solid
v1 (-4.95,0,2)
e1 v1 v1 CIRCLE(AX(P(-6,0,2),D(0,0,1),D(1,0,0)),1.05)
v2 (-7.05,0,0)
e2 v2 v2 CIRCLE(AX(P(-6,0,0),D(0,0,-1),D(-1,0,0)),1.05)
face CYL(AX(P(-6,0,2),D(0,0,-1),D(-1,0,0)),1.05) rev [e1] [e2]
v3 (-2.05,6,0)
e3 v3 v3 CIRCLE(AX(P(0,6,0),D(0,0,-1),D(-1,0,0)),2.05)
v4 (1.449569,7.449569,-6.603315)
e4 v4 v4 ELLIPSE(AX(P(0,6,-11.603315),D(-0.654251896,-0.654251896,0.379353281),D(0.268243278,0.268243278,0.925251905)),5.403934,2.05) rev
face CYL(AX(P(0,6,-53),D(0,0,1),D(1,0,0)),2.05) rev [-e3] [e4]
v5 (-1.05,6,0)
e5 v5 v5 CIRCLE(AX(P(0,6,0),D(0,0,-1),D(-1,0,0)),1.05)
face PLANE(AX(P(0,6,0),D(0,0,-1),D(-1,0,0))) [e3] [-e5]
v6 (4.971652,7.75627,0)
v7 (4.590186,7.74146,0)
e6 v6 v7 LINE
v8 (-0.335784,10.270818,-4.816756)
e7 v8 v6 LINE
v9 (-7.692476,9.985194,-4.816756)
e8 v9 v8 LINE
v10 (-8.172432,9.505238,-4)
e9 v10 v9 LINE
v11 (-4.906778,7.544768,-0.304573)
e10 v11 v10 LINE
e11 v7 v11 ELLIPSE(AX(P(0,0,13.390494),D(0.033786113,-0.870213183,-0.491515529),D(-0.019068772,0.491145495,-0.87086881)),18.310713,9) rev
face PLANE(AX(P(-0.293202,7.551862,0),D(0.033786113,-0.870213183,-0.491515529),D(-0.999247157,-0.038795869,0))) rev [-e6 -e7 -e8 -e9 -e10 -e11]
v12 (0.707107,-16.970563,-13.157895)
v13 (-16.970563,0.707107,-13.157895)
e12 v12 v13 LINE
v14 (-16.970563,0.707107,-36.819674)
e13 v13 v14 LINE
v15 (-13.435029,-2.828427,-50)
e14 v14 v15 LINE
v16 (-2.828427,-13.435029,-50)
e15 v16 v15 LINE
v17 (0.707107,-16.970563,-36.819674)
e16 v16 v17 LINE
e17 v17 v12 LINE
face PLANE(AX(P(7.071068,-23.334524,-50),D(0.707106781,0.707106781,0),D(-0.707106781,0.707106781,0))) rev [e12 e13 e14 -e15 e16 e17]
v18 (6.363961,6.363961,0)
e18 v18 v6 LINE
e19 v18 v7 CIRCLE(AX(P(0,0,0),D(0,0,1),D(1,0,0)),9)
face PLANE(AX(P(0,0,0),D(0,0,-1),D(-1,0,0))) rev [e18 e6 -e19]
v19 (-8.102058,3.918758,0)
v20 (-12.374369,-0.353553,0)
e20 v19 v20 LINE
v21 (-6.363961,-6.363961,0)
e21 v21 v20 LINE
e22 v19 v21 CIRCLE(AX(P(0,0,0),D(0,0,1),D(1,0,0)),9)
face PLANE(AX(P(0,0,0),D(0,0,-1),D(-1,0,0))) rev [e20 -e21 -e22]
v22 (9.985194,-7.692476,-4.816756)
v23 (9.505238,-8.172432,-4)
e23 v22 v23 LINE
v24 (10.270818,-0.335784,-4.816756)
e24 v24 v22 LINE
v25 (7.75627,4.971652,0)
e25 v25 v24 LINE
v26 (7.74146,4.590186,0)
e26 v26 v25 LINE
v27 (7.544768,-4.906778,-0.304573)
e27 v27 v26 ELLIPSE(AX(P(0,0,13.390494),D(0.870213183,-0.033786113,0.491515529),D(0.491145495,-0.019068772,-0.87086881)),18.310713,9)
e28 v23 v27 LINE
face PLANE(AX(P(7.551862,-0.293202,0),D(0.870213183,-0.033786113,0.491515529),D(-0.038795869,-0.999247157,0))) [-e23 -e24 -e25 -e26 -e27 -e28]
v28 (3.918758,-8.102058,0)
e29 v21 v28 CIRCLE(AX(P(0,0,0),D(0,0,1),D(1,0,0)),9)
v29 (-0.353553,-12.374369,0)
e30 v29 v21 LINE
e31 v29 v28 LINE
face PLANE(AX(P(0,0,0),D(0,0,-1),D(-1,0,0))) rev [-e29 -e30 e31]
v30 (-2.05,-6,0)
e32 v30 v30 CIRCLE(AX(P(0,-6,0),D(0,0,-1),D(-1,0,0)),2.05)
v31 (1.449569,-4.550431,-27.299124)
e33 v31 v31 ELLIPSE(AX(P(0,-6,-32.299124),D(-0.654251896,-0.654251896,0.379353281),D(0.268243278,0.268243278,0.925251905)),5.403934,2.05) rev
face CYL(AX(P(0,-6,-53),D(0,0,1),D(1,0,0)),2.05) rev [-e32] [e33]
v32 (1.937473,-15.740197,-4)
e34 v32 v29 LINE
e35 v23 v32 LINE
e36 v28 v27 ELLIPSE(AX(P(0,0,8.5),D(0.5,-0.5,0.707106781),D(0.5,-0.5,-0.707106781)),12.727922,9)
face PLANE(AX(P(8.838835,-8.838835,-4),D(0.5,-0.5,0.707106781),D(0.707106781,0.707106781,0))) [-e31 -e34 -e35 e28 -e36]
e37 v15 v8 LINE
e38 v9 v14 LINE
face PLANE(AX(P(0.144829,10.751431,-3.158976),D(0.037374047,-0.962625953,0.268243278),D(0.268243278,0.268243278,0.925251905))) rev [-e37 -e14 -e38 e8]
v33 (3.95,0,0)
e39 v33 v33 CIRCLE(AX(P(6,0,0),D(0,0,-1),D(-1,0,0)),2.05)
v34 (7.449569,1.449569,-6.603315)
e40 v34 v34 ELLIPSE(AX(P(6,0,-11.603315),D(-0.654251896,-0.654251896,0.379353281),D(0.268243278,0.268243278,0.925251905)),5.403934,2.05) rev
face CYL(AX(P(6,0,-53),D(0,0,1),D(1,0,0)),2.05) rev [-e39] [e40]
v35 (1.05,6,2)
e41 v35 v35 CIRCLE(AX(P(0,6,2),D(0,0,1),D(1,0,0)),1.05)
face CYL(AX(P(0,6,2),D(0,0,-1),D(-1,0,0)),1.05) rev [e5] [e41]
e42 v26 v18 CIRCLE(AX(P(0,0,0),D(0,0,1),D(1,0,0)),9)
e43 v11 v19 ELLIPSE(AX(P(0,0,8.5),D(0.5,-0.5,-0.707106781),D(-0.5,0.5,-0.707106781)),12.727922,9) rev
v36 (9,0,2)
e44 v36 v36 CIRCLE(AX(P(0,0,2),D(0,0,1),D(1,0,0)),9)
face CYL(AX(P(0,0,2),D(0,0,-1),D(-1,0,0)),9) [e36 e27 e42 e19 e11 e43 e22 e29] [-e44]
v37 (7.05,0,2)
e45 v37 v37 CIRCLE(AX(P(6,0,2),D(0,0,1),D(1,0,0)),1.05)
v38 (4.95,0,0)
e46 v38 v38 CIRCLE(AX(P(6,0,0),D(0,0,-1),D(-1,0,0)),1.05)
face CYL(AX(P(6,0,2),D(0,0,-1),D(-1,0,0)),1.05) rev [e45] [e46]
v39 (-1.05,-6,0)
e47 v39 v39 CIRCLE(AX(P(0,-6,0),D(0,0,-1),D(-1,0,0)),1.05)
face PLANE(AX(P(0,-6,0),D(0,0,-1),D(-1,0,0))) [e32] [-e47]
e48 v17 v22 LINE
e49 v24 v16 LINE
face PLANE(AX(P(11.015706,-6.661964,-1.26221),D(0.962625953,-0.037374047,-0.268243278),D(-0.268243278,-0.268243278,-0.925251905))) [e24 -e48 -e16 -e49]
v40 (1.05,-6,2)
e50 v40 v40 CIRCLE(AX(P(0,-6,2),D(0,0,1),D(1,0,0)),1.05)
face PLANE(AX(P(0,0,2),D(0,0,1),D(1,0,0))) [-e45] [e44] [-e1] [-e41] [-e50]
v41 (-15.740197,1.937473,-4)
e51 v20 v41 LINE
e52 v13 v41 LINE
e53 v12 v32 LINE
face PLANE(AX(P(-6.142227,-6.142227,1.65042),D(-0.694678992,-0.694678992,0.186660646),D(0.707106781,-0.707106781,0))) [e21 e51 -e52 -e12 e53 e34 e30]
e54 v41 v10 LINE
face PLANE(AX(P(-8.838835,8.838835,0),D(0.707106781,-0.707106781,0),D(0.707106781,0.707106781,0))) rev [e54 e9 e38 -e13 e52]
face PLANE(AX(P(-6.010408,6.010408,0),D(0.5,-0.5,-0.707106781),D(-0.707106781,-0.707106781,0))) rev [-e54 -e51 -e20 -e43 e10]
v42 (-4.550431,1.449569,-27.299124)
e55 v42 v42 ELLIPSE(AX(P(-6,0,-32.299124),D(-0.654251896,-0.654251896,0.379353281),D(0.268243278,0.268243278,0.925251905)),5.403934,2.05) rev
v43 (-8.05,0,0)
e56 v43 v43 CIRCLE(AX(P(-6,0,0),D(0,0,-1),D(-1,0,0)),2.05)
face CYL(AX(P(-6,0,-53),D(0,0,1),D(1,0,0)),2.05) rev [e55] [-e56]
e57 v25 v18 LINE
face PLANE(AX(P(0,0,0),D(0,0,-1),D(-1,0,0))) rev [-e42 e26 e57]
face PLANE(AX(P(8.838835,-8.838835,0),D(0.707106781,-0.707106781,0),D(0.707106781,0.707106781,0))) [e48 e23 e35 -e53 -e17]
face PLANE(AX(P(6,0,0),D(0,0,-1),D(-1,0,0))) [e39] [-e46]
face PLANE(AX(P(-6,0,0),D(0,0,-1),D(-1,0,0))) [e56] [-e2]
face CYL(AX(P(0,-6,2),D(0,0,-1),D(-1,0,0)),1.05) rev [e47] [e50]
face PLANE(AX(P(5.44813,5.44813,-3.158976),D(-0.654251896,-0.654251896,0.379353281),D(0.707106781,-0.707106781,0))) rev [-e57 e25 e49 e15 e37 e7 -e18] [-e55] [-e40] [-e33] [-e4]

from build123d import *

# Parameters (mm, degrees)
SKETCH1_R           = 9
SKETCH1_R_2         = 1.05
BOSS_EXTRUDE1_DEPTH = 2
CHAMFER1_SIZE       = 4
CUT_EXTRUDE3_START  = -53
SKETCH6_R           = 1.05
CUT_EXTRUDE3_DEPTH  = 53
CUT_EXTRUDE4_START  = -2
SKETCH5_R           = 2.05
CUT_EXTRUDE4_DEPTH  = 53
CHAMFER2_SIZE       = 5
CHAMFER3_SIZE       = 5
CHAMFER3_SIZE_2     = 4.05977785
SKETCH8_W           = 40.645388092
SKETCH8_H           = 21.779978949
CUT_EXTRUDE5_DEPTH  = 34


with BuildPart() as part:
    # Sketch1 → Boss-Extrude1 (new body)
    with BuildSketch(Plane.XY):
        Circle(SKETCH1_R)
        with Locations((0, 6)):
            Circle(SKETCH1_R_2, mode=Mode.SUBTRACT)
        with Locations((-6, 0)):
            Circle(SKETCH1_R_2, mode=Mode.SUBTRACT)
        with Locations((0, -6)):
            Circle(SKETCH1_R_2, mode=Mode.SUBTRACT)
        with Locations((6, 0)):
            Circle(SKETCH1_R_2, mode=Mode.SUBTRACT)
    extrude(amount=BOSS_EXTRUDE1_DEPTH)

    # Sketch3 → Loft1 section 0
    with BuildSketch(Plane(origin=(0, 0, -50), x_dir=(-1, 0, 0), z_dir=(0, 0, -1))):
        with BuildLine():
            Line((-0.707106781, -16.970562748), (16.970562748, 0.707106781))
            Line((16.970562748, 0.707106781), (21.920310217, -4.242640687))
            Line((21.920310217, -4.242640687), (4.242640687, -21.920310217))
            Line((4.242640687, -21.920310217), (-0.707106781, -16.970562748))
        make_face()
    # Sketch2 → Loft1 section 1
    with BuildSketch(Plane(origin=(0, 0, 0), x_dir=(-1, 0, 0), z_dir=(0, 0, -1))):
        with BuildLine():
            Line((-15.202795796, -2.474873734), (2.474873734, 15.202795796))
            Line((2.474873734, 15.202795796), (15.202795796, 2.474873734))
            Line((15.202795796, 2.474873734), (-2.474873734, -15.202795796))
            Line((-2.474873734, -15.202795796), (-15.202795796, -2.474873734))
        make_face()
    loft()

    # Chamfer1
    # the kernel refuses this chamfer: 4 mm, written as the material it takes off along each edge
    with BuildSketch(Plane(origin=(-4.798944185, -22.476613715, 0), x_dir=(-0.7068394360706721, 0.7068394360706747, 0.027495876610586344), z_dir=(0.7071067811865488, 0.7071067811865462, 0))) as chamfer1_piece_1_section:
        Polygon((CHAMFER1_SIZE * 0.999621916911, -CHAMFER1_SIZE * 0.0274958766106), (-CHAMFER1_SIZE * 0.0274958766106, -CHAMFER1_SIZE * 0.999621916911), (0, 0), align=None)
    chamfer1_piece_1 = extrude(amount=38.573463904, mode=Mode.PRIVATE)
    chamfer1_piece_1 = chamfer1_piece_1 - Plane(origin=(0, 0, -1.322334287), x_dir=(1, 0, 0), z_dir=(0, 0, -1)) * Cylinder(9, 94, mode=Mode.PRIVATE)
    add(chamfer1_piece_1, mode=Mode.SUBTRACT)
    with BuildSketch(Plane(origin=(4.798944185, 22.476613715, 0), x_dir=(0.7068394360706721, -0.7068394360706749, 0.027495876610586396), z_dir=(-0.7071067811865489, -0.7071067811865461, 0))) as chamfer1_piece_2_section:
        Polygon((CHAMFER1_SIZE * 0.999621916911, -CHAMFER1_SIZE * 0.0274958766106), (-CHAMFER1_SIZE * 0.0274958766106, -CHAMFER1_SIZE * 0.999621916911), (0, 0), align=None)
    chamfer1_piece_2 = extrude(amount=38.573463904, mode=Mode.PRIVATE)
    chamfer1_piece_2 = chamfer1_piece_2 - Plane(origin=(0, 0, -1.322334287), x_dir=(1, 0, 0), z_dir=(0, 0, -1)) * Cylinder(9, 94, mode=Mode.PRIVATE)
    add(chamfer1_piece_2, mode=Mode.SUBTRACT)

    # Sketch6 → Cut-Extrude3 (cut)
    with BuildSketch(Plane.XY.offset(2).offset(CUT_EXTRUDE3_START)):
        with Locations(Location((0, -6, 0), (0, 0, 45))):
            Circle(SKETCH6_R)
        with Locations(Location((6, 0, 0), (0, 0, 45))):
            Circle(SKETCH6_R)
        with Locations(Location((0, 6, 0), (0, 0, 45))):
            Circle(SKETCH6_R)
        with Locations(Location((-6, 0, 0), (0, 0, 45))):
            Circle(SKETCH6_R)
    extrude(amount=CUT_EXTRUDE3_DEPTH, mode=Mode.SUBTRACT)

    # Sketch5 → Cut-Extrude4 (cut)
    with BuildSketch(Plane.XY.offset(2).offset(CUT_EXTRUDE4_START)):
        with Locations(Location((-6, 0, 0), (0, 0, 45))):
            Circle(SKETCH5_R)
        with Locations(Location((0, -6, 0), (0, 0, 45))):
            Circle(SKETCH5_R)
        with Locations(Location((0, 6, 0), (0, 0, 45))):
            Circle(SKETCH5_R)
        with Locations(Location((6, 0, 0), (0, 0, 45))):
            Circle(SKETCH5_R)
    extrude(amount=-CUT_EXTRUDE4_DEPTH, mode=Mode.SUBTRACT)

    # Chamfer2
    chamfer2_edges = [part.edges().sort_by_distance(p)[0] for p in [
        (-10.302545802, 7.375123728, -27),
        (7.375123728, -10.302545802, -27),
    ]]
    chamfer(chamfer2_edges, length=CHAMFER2_SIZE)

    # Chamfer3
    # the kernel refuses this chamfer: 5, 4.05977785 mm, written as the material it takes off along each edge
    with BuildSketch(Plane(origin=(13.909394742, 12.166115274, 0), x_dir=(0.009375164320641791, -0.2414717461398742, -0.9703625621952453), z_dir=(-0.9992471568778876, -0.03879586925767199, 0))) as chamfer3_piece_1_section:
        Polygon((CHAMFER3_SIZE * 0.999621916911, CHAMFER3_SIZE * 0.0274958766106), (CHAMFER3_SIZE_2 * 0.241653673437, CHAMFER3_SIZE_2 * 0.970362562158), (0, 0), align=None)
    chamfer3_piece_1 = extrude(amount=27.189276823, mode=Mode.PRIVATE)
    chamfer3_piece_1 = chamfer3_piece_1 - Plane(origin=(0, 0, -1.642174888), x_dir=(1, 0, 0), z_dir=(0, 0, -1)) * Cylinder(9, 75, mode=Mode.PRIVATE)
    add(chamfer3_piece_1, mode=Mode.SUBTRACT)
    with BuildSketch(Plane(origin=(12.166115274, 13.909394742, 0), x_dir=(-0.2414717461398332, 0.009375164320638266, -0.9703625621952554), z_dir=(-0.03879586925766401, -0.9992471568778879, 0))) as chamfer3_piece_2_section:
        Polygon((CHAMFER3_SIZE * 0.999621916911, -CHAMFER3_SIZE * 0.0274958766106), (CHAMFER3_SIZE_2 * 0.241653673437, -CHAMFER3_SIZE_2 * 0.970362562158), (0, 0), align=None)
    chamfer3_piece_2 = extrude(amount=27.189276823, mode=Mode.PRIVATE)
    chamfer3_piece_2 = chamfer3_piece_2 - Plane(origin=(0, 0, -1.642174892), x_dir=(1, 0, 0), z_dir=(0, 0, -1)) * Cylinder(9, 75, mode=Mode.PRIVATE)
    add(chamfer3_piece_2, mode=Mode.SUBTRACT)

    # Sketch8 → Cut-Extrude5 (cut)
    with BuildSketch(Plane(origin=(-8.838834765, 8.838834765, 0), x_dir=(0, 0, 1), z_dir=(-0.7071067811865461, 0.7071067811865489, 0))):
        with Locations((-29.677305954, -22.389989475)):
            Rectangle(SKETCH8_W, SKETCH8_H)
    extrude(amount=-CUT_EXTRUDE5_DEPTH, mode=Mode.SUBTRACT)


solid = part.part
